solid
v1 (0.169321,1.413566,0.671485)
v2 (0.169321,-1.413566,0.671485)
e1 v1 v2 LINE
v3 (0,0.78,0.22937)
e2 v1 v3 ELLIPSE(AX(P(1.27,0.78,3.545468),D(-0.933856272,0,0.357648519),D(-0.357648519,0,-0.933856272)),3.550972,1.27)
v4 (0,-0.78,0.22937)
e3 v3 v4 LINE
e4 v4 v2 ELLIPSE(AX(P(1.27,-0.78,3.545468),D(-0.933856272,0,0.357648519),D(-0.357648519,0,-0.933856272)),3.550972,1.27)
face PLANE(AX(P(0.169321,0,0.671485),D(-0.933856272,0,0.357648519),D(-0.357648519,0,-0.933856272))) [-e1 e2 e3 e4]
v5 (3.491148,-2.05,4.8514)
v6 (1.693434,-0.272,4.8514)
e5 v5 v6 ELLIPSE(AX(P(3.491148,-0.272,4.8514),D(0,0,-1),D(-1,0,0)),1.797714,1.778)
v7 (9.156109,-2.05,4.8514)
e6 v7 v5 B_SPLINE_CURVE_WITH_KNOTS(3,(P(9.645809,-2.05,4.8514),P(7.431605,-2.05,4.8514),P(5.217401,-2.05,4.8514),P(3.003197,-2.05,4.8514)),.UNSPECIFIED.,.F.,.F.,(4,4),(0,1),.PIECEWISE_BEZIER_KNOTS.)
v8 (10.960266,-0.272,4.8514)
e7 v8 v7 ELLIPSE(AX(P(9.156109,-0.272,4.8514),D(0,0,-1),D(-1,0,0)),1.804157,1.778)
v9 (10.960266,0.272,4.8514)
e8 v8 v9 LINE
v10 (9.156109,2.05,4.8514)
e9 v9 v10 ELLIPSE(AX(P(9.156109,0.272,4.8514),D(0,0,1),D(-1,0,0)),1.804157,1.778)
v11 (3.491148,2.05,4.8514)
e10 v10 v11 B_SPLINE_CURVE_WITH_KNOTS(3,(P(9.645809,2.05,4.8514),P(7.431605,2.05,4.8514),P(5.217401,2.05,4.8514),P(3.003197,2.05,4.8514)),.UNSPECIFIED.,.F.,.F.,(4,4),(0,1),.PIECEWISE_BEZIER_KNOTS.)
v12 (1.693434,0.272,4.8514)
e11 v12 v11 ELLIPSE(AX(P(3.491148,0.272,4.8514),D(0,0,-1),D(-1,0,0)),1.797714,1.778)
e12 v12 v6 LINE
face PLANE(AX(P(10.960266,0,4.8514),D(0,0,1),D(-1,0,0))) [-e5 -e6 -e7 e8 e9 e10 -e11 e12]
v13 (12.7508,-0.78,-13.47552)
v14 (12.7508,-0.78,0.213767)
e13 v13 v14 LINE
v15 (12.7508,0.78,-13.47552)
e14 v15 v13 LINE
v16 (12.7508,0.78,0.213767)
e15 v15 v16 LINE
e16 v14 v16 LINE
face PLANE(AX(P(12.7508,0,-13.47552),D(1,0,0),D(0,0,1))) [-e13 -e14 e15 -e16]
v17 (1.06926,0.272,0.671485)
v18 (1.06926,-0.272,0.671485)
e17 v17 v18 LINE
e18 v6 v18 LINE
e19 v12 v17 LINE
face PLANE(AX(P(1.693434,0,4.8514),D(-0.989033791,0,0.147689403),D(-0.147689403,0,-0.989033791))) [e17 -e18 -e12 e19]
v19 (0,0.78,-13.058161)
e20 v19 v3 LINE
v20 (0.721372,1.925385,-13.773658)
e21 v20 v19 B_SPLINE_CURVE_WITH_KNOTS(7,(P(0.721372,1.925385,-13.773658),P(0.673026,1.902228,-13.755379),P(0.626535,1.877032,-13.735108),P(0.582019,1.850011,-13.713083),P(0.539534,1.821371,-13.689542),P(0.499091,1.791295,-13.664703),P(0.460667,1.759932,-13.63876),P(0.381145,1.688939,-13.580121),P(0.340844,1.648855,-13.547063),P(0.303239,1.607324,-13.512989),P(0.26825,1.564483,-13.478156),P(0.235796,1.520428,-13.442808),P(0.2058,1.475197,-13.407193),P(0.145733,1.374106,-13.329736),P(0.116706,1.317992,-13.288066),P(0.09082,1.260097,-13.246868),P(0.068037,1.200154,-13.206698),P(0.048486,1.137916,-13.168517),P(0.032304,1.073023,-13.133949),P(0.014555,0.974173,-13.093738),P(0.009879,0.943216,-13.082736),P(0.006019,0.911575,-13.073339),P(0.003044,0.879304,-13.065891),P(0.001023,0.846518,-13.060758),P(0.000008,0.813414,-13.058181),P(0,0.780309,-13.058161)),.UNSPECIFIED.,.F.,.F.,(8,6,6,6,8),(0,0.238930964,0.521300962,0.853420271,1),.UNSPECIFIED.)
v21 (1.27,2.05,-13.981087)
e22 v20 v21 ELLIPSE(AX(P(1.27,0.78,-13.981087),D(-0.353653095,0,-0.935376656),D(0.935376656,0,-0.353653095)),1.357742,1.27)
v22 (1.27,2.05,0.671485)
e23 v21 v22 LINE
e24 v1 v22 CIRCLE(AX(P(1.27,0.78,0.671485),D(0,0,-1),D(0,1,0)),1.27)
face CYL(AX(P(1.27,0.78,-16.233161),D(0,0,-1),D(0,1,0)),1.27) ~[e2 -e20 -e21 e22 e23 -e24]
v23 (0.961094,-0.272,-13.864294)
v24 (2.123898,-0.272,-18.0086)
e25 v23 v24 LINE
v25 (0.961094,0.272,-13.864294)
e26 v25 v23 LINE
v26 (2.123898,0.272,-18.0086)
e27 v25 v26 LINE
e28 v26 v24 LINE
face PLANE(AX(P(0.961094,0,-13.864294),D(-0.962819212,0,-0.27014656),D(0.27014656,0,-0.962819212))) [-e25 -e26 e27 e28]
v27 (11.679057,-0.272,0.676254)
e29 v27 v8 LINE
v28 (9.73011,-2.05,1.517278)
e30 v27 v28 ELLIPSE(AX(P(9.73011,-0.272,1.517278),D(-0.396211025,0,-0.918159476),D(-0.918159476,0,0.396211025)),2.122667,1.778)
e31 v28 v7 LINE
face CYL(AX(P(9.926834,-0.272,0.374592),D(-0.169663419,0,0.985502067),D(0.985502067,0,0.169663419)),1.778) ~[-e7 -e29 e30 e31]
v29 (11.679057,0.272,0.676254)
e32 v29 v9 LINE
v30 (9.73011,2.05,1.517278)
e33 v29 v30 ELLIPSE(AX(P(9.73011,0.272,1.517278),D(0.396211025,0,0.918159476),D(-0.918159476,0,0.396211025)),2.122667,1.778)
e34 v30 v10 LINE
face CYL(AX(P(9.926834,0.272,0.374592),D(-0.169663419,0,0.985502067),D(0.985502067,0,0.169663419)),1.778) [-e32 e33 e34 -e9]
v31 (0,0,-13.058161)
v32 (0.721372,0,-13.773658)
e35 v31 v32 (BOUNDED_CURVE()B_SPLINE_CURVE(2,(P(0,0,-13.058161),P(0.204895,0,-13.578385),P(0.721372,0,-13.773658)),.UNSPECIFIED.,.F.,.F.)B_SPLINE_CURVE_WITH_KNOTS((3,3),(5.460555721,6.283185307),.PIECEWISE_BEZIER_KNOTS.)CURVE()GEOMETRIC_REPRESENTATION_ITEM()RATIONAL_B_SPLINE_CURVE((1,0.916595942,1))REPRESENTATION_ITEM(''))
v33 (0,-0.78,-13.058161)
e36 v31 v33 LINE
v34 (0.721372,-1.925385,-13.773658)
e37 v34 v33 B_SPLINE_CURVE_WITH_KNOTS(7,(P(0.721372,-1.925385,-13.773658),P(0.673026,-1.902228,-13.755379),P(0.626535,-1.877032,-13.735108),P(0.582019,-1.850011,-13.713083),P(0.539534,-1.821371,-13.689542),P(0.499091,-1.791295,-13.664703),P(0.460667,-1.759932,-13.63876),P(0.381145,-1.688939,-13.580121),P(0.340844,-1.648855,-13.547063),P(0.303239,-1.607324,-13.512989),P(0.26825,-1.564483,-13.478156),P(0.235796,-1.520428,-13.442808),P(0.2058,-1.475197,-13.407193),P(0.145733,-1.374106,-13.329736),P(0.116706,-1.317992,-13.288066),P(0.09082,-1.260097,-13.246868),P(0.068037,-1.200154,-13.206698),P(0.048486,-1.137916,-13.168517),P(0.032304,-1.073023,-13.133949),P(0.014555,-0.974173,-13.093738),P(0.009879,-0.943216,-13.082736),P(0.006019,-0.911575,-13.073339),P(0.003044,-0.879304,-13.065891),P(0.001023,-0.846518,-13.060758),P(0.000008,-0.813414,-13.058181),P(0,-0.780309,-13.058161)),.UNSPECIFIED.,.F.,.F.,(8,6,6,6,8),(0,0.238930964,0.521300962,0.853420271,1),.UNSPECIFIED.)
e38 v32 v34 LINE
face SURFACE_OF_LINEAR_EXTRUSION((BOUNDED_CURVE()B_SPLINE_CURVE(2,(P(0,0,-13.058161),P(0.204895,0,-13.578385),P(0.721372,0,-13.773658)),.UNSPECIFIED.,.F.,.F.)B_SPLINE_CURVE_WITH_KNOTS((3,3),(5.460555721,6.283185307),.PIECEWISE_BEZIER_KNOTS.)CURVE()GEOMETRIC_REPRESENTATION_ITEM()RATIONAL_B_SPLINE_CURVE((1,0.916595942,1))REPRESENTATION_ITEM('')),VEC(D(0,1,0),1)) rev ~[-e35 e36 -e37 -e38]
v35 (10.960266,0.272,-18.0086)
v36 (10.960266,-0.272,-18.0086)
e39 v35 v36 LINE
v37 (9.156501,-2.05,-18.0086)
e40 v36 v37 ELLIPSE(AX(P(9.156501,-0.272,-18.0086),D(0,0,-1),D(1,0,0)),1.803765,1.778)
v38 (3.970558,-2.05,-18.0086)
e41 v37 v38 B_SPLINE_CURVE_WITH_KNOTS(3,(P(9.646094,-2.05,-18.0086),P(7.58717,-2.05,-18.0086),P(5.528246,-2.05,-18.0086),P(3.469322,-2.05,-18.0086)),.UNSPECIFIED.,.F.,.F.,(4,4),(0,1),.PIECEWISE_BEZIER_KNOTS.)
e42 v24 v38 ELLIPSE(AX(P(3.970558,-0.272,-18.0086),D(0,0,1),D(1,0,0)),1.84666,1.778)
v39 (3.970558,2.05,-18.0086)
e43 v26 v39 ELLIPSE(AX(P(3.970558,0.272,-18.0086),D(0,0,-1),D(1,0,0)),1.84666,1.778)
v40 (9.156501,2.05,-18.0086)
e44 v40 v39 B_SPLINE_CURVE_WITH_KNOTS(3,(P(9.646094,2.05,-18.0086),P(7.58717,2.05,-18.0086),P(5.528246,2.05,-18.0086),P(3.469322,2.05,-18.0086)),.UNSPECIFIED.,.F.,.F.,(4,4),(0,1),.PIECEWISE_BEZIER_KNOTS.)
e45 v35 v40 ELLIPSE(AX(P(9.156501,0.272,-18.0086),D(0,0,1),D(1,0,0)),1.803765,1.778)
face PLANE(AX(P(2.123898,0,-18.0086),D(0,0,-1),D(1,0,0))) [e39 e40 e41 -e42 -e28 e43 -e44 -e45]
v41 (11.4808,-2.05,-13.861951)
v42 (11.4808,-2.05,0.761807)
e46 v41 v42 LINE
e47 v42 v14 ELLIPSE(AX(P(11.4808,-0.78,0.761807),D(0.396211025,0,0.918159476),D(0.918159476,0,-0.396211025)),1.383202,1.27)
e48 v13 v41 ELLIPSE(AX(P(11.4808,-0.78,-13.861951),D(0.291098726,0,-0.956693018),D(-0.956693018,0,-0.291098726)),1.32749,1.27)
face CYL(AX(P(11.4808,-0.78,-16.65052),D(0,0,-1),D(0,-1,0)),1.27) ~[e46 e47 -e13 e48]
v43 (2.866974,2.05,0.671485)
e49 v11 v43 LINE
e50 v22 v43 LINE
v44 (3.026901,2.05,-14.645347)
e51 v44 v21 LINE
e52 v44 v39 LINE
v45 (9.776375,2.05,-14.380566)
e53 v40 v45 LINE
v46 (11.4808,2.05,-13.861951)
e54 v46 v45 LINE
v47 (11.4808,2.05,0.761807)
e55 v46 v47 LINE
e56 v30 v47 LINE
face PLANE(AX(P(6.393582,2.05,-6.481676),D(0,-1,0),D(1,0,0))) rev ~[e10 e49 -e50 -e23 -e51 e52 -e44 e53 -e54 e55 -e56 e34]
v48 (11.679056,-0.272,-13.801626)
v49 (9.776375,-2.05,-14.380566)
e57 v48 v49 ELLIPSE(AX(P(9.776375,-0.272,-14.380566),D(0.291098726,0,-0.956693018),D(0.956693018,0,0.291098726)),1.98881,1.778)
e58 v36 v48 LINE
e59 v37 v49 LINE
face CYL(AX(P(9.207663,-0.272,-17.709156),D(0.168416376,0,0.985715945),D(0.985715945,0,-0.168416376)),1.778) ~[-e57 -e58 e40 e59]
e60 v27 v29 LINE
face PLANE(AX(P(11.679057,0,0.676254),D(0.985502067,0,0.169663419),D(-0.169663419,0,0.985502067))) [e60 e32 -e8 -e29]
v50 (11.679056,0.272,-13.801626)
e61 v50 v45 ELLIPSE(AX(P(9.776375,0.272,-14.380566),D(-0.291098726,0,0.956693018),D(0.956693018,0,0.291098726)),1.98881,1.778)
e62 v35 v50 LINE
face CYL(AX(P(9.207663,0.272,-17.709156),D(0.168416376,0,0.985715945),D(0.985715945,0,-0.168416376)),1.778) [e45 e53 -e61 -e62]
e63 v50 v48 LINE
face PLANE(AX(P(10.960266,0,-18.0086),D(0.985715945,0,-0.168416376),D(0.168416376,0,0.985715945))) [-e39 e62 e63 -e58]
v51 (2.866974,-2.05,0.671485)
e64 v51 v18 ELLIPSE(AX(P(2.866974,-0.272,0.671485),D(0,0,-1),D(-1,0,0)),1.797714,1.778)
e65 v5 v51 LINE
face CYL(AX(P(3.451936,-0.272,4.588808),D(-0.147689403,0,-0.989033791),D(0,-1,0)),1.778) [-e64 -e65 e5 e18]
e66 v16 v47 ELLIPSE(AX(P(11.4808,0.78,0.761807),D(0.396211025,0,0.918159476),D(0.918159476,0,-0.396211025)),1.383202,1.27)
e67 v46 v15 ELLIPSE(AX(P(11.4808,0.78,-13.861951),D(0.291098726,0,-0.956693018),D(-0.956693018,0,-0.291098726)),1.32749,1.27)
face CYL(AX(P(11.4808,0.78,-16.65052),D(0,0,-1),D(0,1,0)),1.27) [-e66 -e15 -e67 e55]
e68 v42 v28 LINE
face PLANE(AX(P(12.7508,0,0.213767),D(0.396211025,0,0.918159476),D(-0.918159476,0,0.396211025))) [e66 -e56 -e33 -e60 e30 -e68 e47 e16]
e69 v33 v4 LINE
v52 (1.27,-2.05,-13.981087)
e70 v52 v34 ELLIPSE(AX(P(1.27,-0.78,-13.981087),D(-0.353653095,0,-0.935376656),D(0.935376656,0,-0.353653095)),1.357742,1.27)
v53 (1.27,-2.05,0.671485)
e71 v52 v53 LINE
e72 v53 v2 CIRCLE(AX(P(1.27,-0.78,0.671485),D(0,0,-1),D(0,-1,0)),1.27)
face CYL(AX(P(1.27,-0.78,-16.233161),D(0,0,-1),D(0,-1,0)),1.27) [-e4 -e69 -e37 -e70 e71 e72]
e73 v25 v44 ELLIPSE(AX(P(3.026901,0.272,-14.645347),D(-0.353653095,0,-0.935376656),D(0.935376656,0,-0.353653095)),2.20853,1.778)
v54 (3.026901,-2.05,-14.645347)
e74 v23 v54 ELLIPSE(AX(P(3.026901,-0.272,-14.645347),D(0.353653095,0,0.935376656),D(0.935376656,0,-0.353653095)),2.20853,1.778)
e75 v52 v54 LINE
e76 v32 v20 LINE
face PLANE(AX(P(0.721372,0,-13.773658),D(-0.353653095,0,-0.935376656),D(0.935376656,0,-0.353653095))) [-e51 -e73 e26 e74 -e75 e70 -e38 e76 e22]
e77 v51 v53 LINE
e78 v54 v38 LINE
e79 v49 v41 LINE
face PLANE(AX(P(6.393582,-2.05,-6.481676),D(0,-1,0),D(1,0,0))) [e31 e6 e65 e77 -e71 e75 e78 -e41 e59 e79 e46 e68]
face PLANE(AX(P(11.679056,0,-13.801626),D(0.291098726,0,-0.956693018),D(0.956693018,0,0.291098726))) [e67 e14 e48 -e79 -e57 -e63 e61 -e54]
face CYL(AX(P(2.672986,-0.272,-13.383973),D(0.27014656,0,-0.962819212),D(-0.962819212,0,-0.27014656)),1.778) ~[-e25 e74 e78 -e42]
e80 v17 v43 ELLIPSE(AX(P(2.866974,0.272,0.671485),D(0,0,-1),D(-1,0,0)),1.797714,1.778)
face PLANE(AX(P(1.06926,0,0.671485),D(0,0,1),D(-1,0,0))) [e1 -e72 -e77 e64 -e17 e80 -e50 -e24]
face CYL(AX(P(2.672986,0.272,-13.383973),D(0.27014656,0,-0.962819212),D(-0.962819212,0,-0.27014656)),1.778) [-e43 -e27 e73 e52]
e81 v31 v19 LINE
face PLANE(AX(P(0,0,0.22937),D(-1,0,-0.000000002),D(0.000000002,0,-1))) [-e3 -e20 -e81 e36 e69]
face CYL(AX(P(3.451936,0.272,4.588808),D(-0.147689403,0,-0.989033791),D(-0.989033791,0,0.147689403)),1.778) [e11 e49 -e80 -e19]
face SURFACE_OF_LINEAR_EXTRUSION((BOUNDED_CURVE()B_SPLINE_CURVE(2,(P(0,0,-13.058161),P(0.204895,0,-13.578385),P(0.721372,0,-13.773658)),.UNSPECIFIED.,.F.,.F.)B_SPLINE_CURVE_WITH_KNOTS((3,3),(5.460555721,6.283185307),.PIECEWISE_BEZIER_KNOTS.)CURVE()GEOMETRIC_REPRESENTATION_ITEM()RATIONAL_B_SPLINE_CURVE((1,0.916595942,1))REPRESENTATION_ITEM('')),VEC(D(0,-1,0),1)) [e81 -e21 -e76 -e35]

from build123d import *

# Parameters (mm, degrees)
F1_DEPTH    = 2.05
F2_R        = 1.778
F3_T1_DEPTH = 21.8600313558
F3_T3_DEPTH = 20.039287103


# Not quite as in the source:
# - a fillet or chamfer that OpenCascade refuses, or shapes differently, is made with other operations: its cross-section is extruded or revolved along the edge and cut away or added


with BuildPart() as f1:
    # F0 (on Front) → F1 (new body, symmetric)
    with BuildSketch(Plane.XZ):
        with BuildLine():
            Line((10.9602659295, 4.8513999983), (9.6458090239, 4.8513999983))
            add(Edge.make_bspline(
                [(9.6458090239, 4.8513999983), (7.4316049079, 4.8513999983), (5.2174007918, 4.8513999983), (3.0031966758, 4.8513999983)],
                knots=[0, 0, 0, 0, 1, 1, 1, 1], degree=3))
            Line((3.0031966758, 4.8513999983), (1.6934335208, 4.8513999983))
            Line((1.6934335208, 4.8513999983), (1.0692595786, 0.6714852005))
            Line((1.0692595786, 0.6714852005), (0.1693212299, 0.6714852005))
            Line((0.1693212299, 0.6714852005), (-6.1e-09, 0.2293704145))
            Line((-6.1e-09, 0.2293704145), (2.07e-08, -13.0581609413))
            add(Edge.make_bspline(
                [(2.07e-08, -13.0581609413), (0.2048945317, -13.5783853515), (0.7213722482, -13.7736584116)],
                knots=[5.4605557212, 5.4605557212, 5.4605557212, 6.2831853072, 6.2831853072, 6.2831853072], degree=2, weights=[1, 0.9165959415, 1]))
            Line((0.7213722482, -13.7736584116), (0.9610938358, -13.8642938587))
            Line((0.9610938358, -13.8642938587), (2.1238978538, -18.0086))
            Line((2.1238978538, -18.0086), (3.4693217803, -18.0086))
            add(Edge.make_bspline(
                [(9.646094231, -18.0086), (7.5871700808, -18.0086), (5.5282459306, -18.0086), (3.4693217803, -18.0086)],
                knots=[0, 0, 0, 0, 1, 1, 1, 1], degree=3))
            Line((9.646094231, -18.0086), (10.9602659326, -18.0086))
            Line((10.9602659326, -18.0086), (11.6790564953, -13.801625983))
            Line((11.6790564953, -13.801625983), (12.7507999945, -13.4755201564))
            Line((12.7507999945, -13.4755201564), (12.7507999945, 0.2137669466))
            Line((12.7507999945, 0.2137669466), (11.679056502, 0.6762536924))
            Line((11.679056502, 0.6762536924), (10.9602659295, 4.8513999983))
        make_face()
    extrude(amount=F1_DEPTH, both=True)

    # F2
    f2_edges = [f1.edges().sort_by_distance(p)[0] for p in [
        (1.381347, -2.05, 2.761443),
        (1.381347, 2.05, 2.761443),
        (11.319661, -2.05, 2.763827),
        (11.319661, 2.05, 2.763827),
        (11.319661, -2.05, -15.905113),
        (1.542496, -2.05, -15.936447),
        (11.319661, 2.05, -15.905113),
        (1.542496, 2.05, -15.936447),
    ]]
    fillet(f2_edges, radius=F2_R)

    # F3: fillet of radius 1.27 on 4 edges, made by hand

    # F3_s2 → F3_t1 (cut)
    with BuildSketch(Plane.XY.offset(-16.2331609413)):
        with BuildLine():
            ThreePointArc((1.269999983, -2.05), (0.3719743709, -1.6780256121), (-1.7e-08, -0.78))
            Line((-1.7e-08, -0.78), (-1.7e-08, -2.05))
            Line((-1.7e-08, -2.05), (1.269999983, -2.05))
        make_face()
        with BuildLine():
            ThreePointArc((1.269999983, 2.05), (0.3719743709, 1.6780256121), (-1.7e-08, 0.78))
            Line((-1.7e-08, 0.78), (-1.7e-08, 2.05))
            Line((-1.7e-08, 2.05), (1.269999983, 2.05))
        make_face()
    extrude(amount=F3_T1_DEPTH, mode=Mode.SUBTRACT)

    # F3_s4 → F3_t3 (cut)
    with BuildSketch(Plane.XY.offset(-16.6505201564)):
        with BuildLine():
            ThreePointArc((11.4807999945, 2.05), (12.3788256067, 1.6780256121), (12.7507999945, 0.78))
            Line((12.7507999945, 0.78), (12.7507999945, 2.05))
            Line((12.7507999945, 2.05), (11.4807999945, 2.05))
        make_face()
        with BuildLine():
            ThreePointArc((11.4807999945, -2.05), (12.3788256067, -1.6780256121), (12.7507999945, -0.78))
            Line((12.7507999945, -0.78), (12.7507999945, -2.05))
            Line((12.7507999945, -2.05), (11.4807999945, -2.05))
        make_face()
    extrude(amount=F3_T3_DEPTH, mode=Mode.SUBTRACT)


solid = f1.part
